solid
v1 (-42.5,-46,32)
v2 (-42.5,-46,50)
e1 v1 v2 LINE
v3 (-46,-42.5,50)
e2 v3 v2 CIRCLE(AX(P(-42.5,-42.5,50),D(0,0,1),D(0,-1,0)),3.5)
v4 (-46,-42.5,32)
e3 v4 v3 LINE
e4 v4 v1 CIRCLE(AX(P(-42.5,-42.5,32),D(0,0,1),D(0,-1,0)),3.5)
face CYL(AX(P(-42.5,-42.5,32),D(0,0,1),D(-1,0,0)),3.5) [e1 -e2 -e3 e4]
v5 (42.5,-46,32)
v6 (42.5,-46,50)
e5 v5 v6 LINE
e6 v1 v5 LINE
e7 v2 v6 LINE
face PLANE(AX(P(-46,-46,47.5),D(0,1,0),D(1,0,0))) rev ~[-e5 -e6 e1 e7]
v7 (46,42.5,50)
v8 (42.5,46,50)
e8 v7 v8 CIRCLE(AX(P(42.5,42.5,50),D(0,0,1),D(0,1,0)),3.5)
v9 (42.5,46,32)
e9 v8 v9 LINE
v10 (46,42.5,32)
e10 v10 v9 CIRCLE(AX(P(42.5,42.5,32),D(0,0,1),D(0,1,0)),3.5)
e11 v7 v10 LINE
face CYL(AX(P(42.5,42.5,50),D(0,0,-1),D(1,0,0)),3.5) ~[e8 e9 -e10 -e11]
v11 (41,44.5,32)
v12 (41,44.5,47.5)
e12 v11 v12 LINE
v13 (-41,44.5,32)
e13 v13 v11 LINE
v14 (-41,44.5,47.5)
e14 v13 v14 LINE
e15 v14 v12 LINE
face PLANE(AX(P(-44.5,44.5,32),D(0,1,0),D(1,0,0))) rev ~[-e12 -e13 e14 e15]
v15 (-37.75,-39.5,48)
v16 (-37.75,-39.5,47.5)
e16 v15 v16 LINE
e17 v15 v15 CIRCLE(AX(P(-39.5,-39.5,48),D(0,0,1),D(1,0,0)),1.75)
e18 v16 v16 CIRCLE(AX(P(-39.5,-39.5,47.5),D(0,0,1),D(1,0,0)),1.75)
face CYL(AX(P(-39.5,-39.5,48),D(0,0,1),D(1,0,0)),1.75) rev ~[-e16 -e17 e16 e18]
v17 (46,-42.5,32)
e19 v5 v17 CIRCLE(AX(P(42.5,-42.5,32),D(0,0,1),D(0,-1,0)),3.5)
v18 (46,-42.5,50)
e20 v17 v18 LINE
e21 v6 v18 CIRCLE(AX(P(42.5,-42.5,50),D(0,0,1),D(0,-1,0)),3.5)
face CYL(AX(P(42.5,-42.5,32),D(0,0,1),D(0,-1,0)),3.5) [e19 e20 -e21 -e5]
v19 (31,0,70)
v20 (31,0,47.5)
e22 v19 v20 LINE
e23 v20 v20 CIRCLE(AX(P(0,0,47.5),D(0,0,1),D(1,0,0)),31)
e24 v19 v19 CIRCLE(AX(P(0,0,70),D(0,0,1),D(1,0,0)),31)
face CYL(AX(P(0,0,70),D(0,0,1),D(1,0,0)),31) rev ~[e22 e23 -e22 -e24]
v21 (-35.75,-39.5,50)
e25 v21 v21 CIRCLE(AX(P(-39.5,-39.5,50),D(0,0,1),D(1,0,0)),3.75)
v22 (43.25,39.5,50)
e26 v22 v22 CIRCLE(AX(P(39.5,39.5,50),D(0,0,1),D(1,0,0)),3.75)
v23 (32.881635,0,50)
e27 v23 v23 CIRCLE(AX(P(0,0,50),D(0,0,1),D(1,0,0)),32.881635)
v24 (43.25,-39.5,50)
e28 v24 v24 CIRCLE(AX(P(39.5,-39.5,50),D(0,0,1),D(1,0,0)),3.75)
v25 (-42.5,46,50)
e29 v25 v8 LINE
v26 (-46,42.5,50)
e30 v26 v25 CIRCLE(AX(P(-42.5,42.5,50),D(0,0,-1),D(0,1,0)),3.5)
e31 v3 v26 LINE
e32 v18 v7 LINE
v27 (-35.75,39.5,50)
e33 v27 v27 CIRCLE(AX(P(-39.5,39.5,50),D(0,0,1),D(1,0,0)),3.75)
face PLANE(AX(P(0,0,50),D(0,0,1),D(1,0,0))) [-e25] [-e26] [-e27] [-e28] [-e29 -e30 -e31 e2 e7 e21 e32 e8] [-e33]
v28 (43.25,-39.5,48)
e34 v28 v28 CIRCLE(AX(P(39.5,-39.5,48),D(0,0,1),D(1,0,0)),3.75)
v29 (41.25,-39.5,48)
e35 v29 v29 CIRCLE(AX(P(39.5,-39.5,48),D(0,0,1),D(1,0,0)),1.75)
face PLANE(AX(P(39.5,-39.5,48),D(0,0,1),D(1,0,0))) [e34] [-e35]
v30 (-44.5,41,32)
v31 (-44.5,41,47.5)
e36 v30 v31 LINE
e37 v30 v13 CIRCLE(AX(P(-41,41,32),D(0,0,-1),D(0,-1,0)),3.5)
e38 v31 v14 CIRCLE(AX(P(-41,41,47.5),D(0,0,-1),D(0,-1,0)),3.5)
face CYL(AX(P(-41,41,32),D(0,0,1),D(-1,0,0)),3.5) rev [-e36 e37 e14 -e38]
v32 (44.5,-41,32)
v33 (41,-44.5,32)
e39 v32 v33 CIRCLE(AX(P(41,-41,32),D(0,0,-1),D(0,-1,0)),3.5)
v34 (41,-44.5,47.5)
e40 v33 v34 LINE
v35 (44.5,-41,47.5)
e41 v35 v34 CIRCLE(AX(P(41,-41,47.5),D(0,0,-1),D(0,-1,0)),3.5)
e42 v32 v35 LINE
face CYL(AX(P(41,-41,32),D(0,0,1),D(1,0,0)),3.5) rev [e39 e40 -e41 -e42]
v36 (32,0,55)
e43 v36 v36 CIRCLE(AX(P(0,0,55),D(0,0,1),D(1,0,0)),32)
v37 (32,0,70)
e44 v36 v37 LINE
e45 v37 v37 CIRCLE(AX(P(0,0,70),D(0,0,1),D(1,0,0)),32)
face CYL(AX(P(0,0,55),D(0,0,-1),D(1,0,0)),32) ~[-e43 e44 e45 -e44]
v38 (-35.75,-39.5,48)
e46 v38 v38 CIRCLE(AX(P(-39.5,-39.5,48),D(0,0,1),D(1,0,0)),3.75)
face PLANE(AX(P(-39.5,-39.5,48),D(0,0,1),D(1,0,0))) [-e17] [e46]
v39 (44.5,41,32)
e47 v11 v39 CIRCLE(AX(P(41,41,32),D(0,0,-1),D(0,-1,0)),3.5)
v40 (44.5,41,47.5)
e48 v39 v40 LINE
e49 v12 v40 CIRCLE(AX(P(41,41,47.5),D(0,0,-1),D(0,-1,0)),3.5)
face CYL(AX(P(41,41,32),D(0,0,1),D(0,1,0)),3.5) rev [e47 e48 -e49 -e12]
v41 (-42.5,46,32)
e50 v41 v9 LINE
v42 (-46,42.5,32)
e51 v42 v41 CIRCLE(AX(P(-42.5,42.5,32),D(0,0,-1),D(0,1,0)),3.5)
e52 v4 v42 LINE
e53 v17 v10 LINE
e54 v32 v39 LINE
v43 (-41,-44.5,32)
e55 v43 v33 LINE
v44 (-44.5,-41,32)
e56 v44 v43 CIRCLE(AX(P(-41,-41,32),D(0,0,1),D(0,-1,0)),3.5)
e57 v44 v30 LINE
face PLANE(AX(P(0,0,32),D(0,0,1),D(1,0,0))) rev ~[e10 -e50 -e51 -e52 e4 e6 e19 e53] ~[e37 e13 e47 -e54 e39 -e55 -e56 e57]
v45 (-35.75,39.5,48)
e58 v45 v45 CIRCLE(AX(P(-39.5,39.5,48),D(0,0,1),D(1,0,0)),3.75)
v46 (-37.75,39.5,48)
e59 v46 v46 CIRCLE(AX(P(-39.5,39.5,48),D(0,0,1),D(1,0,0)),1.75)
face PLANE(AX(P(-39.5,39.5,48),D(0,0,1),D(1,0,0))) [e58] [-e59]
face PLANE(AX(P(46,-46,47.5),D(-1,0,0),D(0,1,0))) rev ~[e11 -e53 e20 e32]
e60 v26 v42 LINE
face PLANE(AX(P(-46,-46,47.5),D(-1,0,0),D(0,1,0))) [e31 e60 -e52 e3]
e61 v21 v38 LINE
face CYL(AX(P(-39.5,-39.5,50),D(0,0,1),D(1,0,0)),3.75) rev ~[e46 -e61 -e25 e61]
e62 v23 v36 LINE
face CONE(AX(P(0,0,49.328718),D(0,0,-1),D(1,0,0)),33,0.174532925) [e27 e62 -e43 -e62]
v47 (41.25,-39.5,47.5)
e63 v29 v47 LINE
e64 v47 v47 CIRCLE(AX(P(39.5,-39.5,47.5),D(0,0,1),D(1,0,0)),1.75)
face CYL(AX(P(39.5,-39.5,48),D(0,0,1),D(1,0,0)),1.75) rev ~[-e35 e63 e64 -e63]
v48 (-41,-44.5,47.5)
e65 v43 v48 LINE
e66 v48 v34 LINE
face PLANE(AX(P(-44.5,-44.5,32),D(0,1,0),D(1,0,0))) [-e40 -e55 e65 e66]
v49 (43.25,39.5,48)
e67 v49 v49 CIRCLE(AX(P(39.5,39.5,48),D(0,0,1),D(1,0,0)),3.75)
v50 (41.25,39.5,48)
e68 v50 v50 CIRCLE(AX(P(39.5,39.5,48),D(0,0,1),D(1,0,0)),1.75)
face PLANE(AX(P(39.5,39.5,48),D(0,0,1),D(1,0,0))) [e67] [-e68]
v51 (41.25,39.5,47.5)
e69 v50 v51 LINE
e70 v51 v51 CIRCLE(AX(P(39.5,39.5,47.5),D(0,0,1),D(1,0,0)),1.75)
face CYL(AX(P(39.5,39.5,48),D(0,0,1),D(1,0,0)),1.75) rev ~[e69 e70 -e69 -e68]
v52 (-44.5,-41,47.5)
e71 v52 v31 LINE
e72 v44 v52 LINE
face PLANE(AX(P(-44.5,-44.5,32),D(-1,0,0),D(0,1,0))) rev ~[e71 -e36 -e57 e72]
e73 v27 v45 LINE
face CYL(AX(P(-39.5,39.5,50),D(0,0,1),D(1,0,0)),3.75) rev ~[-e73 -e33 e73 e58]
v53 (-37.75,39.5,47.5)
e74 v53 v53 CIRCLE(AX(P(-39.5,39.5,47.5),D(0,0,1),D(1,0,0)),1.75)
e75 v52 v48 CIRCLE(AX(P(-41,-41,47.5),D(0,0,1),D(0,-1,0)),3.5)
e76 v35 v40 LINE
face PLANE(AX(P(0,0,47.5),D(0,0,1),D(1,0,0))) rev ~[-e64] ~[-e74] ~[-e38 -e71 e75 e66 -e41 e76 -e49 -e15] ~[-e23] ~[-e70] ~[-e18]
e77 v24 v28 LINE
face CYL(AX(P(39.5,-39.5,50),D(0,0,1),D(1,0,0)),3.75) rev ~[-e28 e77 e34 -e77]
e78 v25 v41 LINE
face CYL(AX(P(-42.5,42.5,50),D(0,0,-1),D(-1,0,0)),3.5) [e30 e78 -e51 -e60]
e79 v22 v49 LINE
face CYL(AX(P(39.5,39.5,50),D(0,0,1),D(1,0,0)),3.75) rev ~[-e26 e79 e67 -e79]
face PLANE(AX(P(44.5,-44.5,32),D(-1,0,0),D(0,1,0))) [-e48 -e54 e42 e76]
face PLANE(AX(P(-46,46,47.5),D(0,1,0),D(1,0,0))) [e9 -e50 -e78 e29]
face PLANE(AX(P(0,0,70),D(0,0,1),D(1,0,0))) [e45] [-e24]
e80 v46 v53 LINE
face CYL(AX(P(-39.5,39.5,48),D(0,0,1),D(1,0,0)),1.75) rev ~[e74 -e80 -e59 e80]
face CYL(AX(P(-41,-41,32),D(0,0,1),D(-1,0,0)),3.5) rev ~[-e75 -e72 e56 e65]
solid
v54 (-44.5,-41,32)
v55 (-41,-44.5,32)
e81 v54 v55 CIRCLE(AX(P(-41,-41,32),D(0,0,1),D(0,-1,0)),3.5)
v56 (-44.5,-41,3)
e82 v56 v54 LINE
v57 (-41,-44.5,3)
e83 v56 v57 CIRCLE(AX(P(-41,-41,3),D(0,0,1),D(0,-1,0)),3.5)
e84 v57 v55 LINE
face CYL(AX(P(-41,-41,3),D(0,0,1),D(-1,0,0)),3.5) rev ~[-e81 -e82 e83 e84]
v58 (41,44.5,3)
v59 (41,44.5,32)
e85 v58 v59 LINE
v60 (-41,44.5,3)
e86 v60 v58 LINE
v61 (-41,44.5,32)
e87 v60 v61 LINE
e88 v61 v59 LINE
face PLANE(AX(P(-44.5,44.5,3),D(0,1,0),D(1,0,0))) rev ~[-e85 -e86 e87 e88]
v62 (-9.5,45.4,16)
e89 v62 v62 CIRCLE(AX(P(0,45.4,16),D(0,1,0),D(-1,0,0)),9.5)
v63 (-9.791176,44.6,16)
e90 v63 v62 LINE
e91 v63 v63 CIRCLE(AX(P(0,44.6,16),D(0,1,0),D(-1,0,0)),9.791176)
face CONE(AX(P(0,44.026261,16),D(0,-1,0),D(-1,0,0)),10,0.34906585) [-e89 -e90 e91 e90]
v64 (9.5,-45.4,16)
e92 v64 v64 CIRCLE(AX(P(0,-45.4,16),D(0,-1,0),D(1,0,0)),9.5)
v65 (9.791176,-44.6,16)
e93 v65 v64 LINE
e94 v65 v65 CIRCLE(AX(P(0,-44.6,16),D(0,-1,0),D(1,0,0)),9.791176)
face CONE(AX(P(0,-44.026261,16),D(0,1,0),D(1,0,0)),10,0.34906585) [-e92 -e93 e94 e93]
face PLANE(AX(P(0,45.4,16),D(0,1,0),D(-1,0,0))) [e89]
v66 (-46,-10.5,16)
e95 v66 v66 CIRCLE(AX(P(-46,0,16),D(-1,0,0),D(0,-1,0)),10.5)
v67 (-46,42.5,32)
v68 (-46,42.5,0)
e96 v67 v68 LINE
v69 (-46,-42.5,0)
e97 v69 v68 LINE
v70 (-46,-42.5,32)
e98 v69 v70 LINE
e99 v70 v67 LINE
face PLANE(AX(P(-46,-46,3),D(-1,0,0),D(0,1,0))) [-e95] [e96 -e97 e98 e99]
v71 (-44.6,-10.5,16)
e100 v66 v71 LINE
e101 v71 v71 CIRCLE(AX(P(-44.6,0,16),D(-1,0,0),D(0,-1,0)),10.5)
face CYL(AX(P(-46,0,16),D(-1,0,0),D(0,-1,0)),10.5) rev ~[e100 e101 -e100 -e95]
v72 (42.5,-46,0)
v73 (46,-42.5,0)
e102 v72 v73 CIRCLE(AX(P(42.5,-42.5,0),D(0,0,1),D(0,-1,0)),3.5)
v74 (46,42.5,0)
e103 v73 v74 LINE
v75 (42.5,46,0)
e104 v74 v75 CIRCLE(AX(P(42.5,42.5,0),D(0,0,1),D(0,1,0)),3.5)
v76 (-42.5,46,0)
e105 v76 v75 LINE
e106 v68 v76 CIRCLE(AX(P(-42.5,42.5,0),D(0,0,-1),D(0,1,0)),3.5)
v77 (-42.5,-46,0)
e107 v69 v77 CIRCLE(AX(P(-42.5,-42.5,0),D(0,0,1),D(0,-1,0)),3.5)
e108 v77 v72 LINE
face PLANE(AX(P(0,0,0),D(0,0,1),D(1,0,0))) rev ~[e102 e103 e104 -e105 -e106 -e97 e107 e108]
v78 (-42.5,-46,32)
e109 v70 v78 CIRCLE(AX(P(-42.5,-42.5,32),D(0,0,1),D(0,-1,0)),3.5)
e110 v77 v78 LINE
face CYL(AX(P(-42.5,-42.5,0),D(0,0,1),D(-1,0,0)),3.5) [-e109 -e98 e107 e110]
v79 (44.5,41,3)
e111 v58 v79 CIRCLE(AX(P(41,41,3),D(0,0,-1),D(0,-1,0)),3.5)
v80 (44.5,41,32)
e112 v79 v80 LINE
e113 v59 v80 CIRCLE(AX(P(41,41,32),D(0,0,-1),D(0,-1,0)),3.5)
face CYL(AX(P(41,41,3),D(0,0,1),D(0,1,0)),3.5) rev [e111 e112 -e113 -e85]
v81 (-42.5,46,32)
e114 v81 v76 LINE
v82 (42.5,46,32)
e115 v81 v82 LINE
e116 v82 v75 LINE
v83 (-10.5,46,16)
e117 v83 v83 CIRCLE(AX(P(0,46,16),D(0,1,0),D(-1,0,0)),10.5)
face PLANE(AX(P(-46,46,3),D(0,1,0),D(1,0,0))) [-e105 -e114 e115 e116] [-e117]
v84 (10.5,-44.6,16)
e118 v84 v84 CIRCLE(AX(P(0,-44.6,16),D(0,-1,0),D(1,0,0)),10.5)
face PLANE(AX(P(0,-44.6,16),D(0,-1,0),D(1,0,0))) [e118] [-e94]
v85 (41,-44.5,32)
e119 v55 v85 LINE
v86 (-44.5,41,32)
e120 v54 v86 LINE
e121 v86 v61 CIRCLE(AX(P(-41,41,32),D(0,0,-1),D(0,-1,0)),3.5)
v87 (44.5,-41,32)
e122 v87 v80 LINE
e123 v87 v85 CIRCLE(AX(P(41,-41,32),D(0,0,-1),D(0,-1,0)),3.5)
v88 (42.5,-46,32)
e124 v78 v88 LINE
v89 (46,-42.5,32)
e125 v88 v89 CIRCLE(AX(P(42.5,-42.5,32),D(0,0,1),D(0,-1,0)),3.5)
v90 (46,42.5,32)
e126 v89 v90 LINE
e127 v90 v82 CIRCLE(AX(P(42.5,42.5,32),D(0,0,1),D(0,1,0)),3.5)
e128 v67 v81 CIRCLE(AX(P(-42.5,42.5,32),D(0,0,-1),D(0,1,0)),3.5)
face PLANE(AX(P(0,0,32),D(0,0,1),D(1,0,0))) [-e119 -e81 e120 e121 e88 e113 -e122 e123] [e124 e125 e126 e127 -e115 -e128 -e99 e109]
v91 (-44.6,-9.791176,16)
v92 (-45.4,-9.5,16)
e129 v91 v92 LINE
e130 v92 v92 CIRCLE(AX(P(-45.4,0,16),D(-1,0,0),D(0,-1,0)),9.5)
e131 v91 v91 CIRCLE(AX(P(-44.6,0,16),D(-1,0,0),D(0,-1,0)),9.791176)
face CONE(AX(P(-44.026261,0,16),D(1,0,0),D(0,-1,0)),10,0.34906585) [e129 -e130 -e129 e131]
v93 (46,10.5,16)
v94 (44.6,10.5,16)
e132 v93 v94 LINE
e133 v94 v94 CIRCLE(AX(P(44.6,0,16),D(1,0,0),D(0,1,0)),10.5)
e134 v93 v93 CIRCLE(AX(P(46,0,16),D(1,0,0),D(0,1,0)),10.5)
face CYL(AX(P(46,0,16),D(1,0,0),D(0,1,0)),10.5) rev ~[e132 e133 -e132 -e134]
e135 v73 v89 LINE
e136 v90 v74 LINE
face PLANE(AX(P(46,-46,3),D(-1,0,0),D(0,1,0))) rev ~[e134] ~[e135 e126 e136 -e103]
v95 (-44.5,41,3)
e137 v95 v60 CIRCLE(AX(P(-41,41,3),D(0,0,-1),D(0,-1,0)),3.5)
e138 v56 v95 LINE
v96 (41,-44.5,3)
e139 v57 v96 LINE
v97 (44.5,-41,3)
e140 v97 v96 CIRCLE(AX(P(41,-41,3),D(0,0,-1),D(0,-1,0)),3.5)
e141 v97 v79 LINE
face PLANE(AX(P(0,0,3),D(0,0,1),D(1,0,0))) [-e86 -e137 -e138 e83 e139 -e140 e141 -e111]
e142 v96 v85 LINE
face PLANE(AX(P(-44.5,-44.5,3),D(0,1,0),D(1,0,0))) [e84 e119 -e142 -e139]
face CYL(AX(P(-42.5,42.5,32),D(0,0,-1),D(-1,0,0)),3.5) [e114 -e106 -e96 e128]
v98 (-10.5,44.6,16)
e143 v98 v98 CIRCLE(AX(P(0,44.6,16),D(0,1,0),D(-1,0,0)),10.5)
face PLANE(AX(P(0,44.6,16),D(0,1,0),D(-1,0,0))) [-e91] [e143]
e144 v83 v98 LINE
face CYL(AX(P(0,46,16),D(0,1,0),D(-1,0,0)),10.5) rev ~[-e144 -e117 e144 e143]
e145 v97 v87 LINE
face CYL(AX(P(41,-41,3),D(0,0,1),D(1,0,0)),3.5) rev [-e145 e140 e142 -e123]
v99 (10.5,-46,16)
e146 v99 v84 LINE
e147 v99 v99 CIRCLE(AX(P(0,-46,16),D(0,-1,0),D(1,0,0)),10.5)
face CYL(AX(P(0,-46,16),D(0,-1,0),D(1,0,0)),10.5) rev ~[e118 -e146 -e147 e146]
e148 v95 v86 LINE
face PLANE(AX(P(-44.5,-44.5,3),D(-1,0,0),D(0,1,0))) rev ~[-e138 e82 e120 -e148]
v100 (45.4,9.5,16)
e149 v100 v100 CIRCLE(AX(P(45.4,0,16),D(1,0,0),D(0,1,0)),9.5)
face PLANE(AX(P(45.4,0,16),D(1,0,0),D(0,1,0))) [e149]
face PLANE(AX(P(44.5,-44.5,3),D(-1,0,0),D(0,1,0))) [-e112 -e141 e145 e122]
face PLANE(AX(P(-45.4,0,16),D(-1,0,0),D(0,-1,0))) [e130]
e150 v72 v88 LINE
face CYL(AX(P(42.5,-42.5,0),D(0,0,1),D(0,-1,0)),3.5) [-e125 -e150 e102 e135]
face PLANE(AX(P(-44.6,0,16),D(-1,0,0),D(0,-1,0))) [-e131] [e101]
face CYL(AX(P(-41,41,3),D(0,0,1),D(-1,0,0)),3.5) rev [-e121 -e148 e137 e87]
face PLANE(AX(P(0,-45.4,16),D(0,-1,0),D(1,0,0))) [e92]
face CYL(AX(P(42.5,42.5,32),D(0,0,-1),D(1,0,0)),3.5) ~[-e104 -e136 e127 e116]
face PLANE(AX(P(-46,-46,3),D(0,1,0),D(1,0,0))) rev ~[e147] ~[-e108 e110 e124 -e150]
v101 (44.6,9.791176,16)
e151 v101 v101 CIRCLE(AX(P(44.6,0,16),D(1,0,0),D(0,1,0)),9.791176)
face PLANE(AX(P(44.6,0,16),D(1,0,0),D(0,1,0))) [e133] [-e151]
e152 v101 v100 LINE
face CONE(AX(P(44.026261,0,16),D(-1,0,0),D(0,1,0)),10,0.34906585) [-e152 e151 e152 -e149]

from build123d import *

# Parameters (mm, degrees)
F0_W      = 92
F0_H      = 92
F1_DEPTH  = 3
F4_W      = 92
F4_H      = 92
F4_W_2    = 89
F4_H_2    = 89
F5_DEPTH  = 29
F6_R      = 3.5
F7_R      = 10.5
F8_DEPTH  = 1.4
F9_R      = 10
F10_DEPTH = 0.8
F12_R     = 10.5
F13_DEPTH = 1.4
F14_R     = 10
F15_DEPTH = 0.8
F17_R     = 10.5
F18_DEPTH = 1.4
F19_R     = 10
F20_DEPTH = 0.8
F22_R     = 10.5
F23_DEPTH = 1.4
F24_R     = 10
F25_DEPTH = 0.8
F28_W     = 92
F28_H     = 92
F28_W_2   = 89
F28_H_2   = 89
F29_DEPTH = 15.5
F30_W     = 92
F30_H     = 92
F31_DEPTH = 2.5
F32_R     = 3.5
F33_R     = 3.75
F34_DEPTH = 2
F35_R     = 1.75
F36_DEPTH = 2.5
F37_R     = 1.75
F38_DEPTH = 2.5
F39_R     = 1.75
F40_DEPTH = 25
F41_R     = 1.75
F42_DEPTH = 25
F43_R     = 33
F44_DEPTH = 5
F46_R     = 32
F47_DEPTH = 15
F48_R     = 31
F49_DEPTH = 25


# Not quite as in the source:
# - a fillet or chamfer that OpenCascade refuses, or shapes differently, is made with other operations: its cross-section is extruded or revolved along the edge and cut away or added
# - a feature of the source that left no trace in its solid (it failed there, or was rolled back) is left out


with BuildPart() as f1:
    # F0 (on Top) → F1 (new body)
    with BuildSketch(Plane.XY):
        Rectangle(F0_W, F0_H)
    extrude(amount=F1_DEPTH)

    # F4 (on offset) → F5 (join)
    with BuildSketch(Plane.XY.offset(3)):
        Rectangle(F4_W, F4_H)
        Rectangle(F4_W_2, F4_H_2, mode=Mode.SUBTRACT)
    extrude(amount=F5_DEPTH)

    # F6
    f6_edges = [f1.edges().sort_by_distance(p)[0] for p in [
        (-44.5, -44.5, 17.5),
        (-46, -46, 16),
        (-46, 46, 16),
        (-44.5, 44.5, 17.5),
        (46, 46, 16),
        (44.5, 44.5, 17.5),
        (46, -46, 16),
        (44.5, -44.5, 17.5),
    ]]
    fillet(f6_edges, radius=F6_R)

    # F7 (on face) → F8 (cut)
    with BuildSketch(Plane.XZ.offset(46)):
        with Locations((0, 16)):
            Circle(F7_R)
    extrude(amount=-F8_DEPTH, mode=Mode.SUBTRACT)

    # F9 (on face) → F10 (join)
    with BuildSketch(Plane.XZ.offset(44.6)):
        with Locations((0, 16)):
            Circle(F9_R)
    extrude(amount=F10_DEPTH)

    # F11: chamfer of 0.5 x 1.3737387097 on 1 edges, made by hand


with BuildPart() as f11_tool2:
    # F11_s3 → F11_t4 (revolve)
    with BuildSketch(Plane.XY.offset(16)):
        Polygon((10, -44.0262612903), (9.5, -45.4), (10, -45.4), align=None)
    revolve(axis=Axis((0, -45.4, 16), (0, -1, 0)))

    split(bisect_by=Plane.XZ.offset(44.6), keep=Keep.TOP)


with BuildPart() as f1_1:
    add(f1.part)

    # F11_t1: cut F11_tool2
    add(f11_tool2.part, mode=Mode.SUBTRACT)

    # F12 (on face) → F13 (cut)
    with BuildSketch(Plane(origin=(-46, 0, 0), x_dir=(0, -1, 0), z_dir=(-1, 0, 0))):
        with Locations((0, 16)):
            Circle(F12_R)
    extrude(amount=-F13_DEPTH, mode=Mode.SUBTRACT)

    # F14 (on face) → F15 (join)
    with BuildSketch(Plane(origin=(-44.6, 0, 0), x_dir=(0, -1, 0), z_dir=(-1, 0, 0))):
        with Locations((0, 16)):
            Circle(F14_R)
    extrude(amount=F15_DEPTH)

    # F16: chamfer of 0.5 x 1.3737387097 on 1 edges, made by hand


with BuildPart() as f16_tool2:
    # F16_s3 → F16_t4 (revolve)
    with BuildSketch(Plane.XY.offset(16)):
        Polygon((-44.0262612903, -10), (-45.4, -9.5), (-45.4, -10), align=None)
    revolve(axis=Axis((-45.4, 0, 16), (-1, 0, 0)))

    split(bisect_by=Plane.YZ.offset(-44.6), keep=Keep.BOTTOM)


with BuildPart() as f1_2:
    add(f1_1.part)

    # F16_t1: cut F16_tool2
    add(f16_tool2.part, mode=Mode.SUBTRACT)

    # F17 (on face) → F18 (cut)
    with BuildSketch(Plane(origin=(0, 46, 0), x_dir=(-1, 0, 0), z_dir=(0, 1, 0))):
        with Locations((0, 16)):
            Circle(F17_R)
    extrude(amount=-F18_DEPTH, mode=Mode.SUBTRACT)

    # F19 (on face) → F20 (join)
    with BuildSketch(Plane(origin=(0, 44.6, 0), x_dir=(-1, 0, 0), z_dir=(0, 1, 0))):
        with Locations((0, 16)):
            Circle(F19_R)
    extrude(amount=F20_DEPTH)

    # F21: chamfer of 0.5 x 1.3737387097 on 1 edges, made by hand


with BuildPart() as f21_tool2:
    # F21_s3 → F21_t4 (revolve)
    with BuildSketch(Plane.XY.offset(16)):
        Polygon((-10, 44.0262612903), (-9.5, 45.4), (-10, 45.4), align=None)
    revolve(axis=Axis((0, 45.4, 16), (0, 1, 0)))

    split(bisect_by=Plane.XZ.offset(-44.6), keep=Keep.BOTTOM)


with BuildPart() as f1_3:
    add(f1_2.part)

    # F21_t1: cut F21_tool2
    add(f21_tool2.part, mode=Mode.SUBTRACT)

    # F22 (on face) → F23 (cut)
    with BuildSketch(Plane.YZ.offset(46)):
        with Locations((0, 16)):
            Circle(F22_R)
    extrude(amount=-F23_DEPTH, mode=Mode.SUBTRACT)

    # F24 (on face) → F25 (join)
    with BuildSketch(Plane.YZ.offset(44.6)):
        with Locations((0, 16)):
            Circle(F24_R)
    extrude(amount=F25_DEPTH)

    # F26: chamfer of 0.5 x 1.3737387097 on 1 edges, made by hand


with BuildPart() as f26_tool2:
    # F26_s3 → F26_t4 (revolve)
    with BuildSketch(Plane.XY.offset(16)):
        Polygon((44.0262612903, 10), (45.4, 9.5), (45.4, 10), align=None)
    revolve(axis=Axis((45.4, 0, 16), (1, 0, 0)))

    split(bisect_by=Plane.YZ.offset(44.6), keep=Keep.TOP)


with BuildPart() as f1_4:
    add(f1_3.part)

    # F26_t1: cut F26_tool2
    add(f26_tool2.part, mode=Mode.SUBTRACT)


with BuildPart() as f29:
    # F28 (on offset) → F29 (new body)
    with BuildSketch(Plane.XY.offset(32)):
        Rectangle(F28_W, F28_H)
        Rectangle(F28_W_2, F28_H_2, mode=Mode.SUBTRACT)
    extrude(amount=F29_DEPTH)

    # F30 (on face) → F31 (join)
    with BuildSketch(Plane.XY.offset(47.5)):
        Rectangle(F30_W, F30_H)
    extrude(amount=F31_DEPTH)

    # F32
    f32_edges = [f29.edges().sort_by_distance(p)[0] for p in [
        (-46, -46, 41),
        (-44.5, -44.5, 39.75),
        (46, -46, 41),
        (44.5, -44.5, 39.75),
        (44.5, 44.5, 39.75),
        (46, 46, 41),
        (-46, 46, 41),
        (-44.5, 44.5, 39.75),
    ]]
    fillet(f32_edges, radius=F32_R)

    # F33 (on face) → F34 (cut)
    with BuildSketch(Plane.XY.offset(50)):
        with Locations((-39.5, 39.5)):
            Circle(F33_R)
        with Locations((39.5, 39.5)):
            Circle(F33_R)
        with Locations((39.5, -39.5)):
            Circle(F33_R)
        with Locations((-39.5, -39.5)):
            Circle(F33_R)
    extrude(amount=-F34_DEPTH, mode=Mode.SUBTRACT)

    # F35 (on face) → F36 (cut)
    with BuildSketch(Plane.XY.offset(48)):
        with Locations((-39.5, 39.5)):
            Circle(F35_R)
    extrude(amount=-F36_DEPTH, mode=Mode.SUBTRACT)

    # F37 (on face) → F38 (cut)
    with BuildSketch(Plane.XY.offset(48)):
        with Locations((39.5, 39.5)):
            Circle(F37_R)
    extrude(amount=-F38_DEPTH, mode=Mode.SUBTRACT)

    # F39 (on face) → F40 (cut)
    with BuildSketch(Plane.XY.offset(48)):
        with Locations((39.5, -39.5)):
            Circle(F39_R)
    extrude(amount=-F40_DEPTH, mode=Mode.SUBTRACT)

    # F41 (on face) → F42 (cut)
    with BuildSketch(Plane.XY.offset(48)):
        with Locations((-39.5, -39.5)):
            Circle(F41_R)
    extrude(amount=-F42_DEPTH, mode=Mode.SUBTRACT)

    # F43 (on face) → F44 (join)
    with BuildSketch(Plane.XY.offset(50)):
        Circle(F43_R)
    extrude(amount=F44_DEPTH)

    # F45: chamfer of 1 x 5.6712818196 on 1 edges, made by hand


with BuildPart() as f45_tool2:
    # F45_s3 → F45_t4 (revolve)
    with BuildSketch(Plane.XZ):
        Polygon((33, 49.3287181804), (32, 55), (33, 55), align=None)
    revolve(axis=Axis((0, 0, 55), (0, 0, 1)))

    split(bisect_by=Plane.XY.offset(50), keep=Keep.TOP)


with BuildPart() as f29_1:
    add(f29.part)

    # F45_t1: cut F45_tool2
    add(f45_tool2.part, mode=Mode.SUBTRACT)

    # F46 (on face) → F47 (join)
    with BuildSketch(Plane.XY.offset(55)):
        Circle(F46_R)
    extrude(amount=F47_DEPTH)

    # F48 (on face) → F49 (cut)
    with BuildSketch(Plane.XY.offset(70)):
        Circle(F48_R)
    extrude(amount=-F49_DEPTH, mode=Mode.SUBTRACT)


solid = Compound([f1_4.part, f29_1.part])
